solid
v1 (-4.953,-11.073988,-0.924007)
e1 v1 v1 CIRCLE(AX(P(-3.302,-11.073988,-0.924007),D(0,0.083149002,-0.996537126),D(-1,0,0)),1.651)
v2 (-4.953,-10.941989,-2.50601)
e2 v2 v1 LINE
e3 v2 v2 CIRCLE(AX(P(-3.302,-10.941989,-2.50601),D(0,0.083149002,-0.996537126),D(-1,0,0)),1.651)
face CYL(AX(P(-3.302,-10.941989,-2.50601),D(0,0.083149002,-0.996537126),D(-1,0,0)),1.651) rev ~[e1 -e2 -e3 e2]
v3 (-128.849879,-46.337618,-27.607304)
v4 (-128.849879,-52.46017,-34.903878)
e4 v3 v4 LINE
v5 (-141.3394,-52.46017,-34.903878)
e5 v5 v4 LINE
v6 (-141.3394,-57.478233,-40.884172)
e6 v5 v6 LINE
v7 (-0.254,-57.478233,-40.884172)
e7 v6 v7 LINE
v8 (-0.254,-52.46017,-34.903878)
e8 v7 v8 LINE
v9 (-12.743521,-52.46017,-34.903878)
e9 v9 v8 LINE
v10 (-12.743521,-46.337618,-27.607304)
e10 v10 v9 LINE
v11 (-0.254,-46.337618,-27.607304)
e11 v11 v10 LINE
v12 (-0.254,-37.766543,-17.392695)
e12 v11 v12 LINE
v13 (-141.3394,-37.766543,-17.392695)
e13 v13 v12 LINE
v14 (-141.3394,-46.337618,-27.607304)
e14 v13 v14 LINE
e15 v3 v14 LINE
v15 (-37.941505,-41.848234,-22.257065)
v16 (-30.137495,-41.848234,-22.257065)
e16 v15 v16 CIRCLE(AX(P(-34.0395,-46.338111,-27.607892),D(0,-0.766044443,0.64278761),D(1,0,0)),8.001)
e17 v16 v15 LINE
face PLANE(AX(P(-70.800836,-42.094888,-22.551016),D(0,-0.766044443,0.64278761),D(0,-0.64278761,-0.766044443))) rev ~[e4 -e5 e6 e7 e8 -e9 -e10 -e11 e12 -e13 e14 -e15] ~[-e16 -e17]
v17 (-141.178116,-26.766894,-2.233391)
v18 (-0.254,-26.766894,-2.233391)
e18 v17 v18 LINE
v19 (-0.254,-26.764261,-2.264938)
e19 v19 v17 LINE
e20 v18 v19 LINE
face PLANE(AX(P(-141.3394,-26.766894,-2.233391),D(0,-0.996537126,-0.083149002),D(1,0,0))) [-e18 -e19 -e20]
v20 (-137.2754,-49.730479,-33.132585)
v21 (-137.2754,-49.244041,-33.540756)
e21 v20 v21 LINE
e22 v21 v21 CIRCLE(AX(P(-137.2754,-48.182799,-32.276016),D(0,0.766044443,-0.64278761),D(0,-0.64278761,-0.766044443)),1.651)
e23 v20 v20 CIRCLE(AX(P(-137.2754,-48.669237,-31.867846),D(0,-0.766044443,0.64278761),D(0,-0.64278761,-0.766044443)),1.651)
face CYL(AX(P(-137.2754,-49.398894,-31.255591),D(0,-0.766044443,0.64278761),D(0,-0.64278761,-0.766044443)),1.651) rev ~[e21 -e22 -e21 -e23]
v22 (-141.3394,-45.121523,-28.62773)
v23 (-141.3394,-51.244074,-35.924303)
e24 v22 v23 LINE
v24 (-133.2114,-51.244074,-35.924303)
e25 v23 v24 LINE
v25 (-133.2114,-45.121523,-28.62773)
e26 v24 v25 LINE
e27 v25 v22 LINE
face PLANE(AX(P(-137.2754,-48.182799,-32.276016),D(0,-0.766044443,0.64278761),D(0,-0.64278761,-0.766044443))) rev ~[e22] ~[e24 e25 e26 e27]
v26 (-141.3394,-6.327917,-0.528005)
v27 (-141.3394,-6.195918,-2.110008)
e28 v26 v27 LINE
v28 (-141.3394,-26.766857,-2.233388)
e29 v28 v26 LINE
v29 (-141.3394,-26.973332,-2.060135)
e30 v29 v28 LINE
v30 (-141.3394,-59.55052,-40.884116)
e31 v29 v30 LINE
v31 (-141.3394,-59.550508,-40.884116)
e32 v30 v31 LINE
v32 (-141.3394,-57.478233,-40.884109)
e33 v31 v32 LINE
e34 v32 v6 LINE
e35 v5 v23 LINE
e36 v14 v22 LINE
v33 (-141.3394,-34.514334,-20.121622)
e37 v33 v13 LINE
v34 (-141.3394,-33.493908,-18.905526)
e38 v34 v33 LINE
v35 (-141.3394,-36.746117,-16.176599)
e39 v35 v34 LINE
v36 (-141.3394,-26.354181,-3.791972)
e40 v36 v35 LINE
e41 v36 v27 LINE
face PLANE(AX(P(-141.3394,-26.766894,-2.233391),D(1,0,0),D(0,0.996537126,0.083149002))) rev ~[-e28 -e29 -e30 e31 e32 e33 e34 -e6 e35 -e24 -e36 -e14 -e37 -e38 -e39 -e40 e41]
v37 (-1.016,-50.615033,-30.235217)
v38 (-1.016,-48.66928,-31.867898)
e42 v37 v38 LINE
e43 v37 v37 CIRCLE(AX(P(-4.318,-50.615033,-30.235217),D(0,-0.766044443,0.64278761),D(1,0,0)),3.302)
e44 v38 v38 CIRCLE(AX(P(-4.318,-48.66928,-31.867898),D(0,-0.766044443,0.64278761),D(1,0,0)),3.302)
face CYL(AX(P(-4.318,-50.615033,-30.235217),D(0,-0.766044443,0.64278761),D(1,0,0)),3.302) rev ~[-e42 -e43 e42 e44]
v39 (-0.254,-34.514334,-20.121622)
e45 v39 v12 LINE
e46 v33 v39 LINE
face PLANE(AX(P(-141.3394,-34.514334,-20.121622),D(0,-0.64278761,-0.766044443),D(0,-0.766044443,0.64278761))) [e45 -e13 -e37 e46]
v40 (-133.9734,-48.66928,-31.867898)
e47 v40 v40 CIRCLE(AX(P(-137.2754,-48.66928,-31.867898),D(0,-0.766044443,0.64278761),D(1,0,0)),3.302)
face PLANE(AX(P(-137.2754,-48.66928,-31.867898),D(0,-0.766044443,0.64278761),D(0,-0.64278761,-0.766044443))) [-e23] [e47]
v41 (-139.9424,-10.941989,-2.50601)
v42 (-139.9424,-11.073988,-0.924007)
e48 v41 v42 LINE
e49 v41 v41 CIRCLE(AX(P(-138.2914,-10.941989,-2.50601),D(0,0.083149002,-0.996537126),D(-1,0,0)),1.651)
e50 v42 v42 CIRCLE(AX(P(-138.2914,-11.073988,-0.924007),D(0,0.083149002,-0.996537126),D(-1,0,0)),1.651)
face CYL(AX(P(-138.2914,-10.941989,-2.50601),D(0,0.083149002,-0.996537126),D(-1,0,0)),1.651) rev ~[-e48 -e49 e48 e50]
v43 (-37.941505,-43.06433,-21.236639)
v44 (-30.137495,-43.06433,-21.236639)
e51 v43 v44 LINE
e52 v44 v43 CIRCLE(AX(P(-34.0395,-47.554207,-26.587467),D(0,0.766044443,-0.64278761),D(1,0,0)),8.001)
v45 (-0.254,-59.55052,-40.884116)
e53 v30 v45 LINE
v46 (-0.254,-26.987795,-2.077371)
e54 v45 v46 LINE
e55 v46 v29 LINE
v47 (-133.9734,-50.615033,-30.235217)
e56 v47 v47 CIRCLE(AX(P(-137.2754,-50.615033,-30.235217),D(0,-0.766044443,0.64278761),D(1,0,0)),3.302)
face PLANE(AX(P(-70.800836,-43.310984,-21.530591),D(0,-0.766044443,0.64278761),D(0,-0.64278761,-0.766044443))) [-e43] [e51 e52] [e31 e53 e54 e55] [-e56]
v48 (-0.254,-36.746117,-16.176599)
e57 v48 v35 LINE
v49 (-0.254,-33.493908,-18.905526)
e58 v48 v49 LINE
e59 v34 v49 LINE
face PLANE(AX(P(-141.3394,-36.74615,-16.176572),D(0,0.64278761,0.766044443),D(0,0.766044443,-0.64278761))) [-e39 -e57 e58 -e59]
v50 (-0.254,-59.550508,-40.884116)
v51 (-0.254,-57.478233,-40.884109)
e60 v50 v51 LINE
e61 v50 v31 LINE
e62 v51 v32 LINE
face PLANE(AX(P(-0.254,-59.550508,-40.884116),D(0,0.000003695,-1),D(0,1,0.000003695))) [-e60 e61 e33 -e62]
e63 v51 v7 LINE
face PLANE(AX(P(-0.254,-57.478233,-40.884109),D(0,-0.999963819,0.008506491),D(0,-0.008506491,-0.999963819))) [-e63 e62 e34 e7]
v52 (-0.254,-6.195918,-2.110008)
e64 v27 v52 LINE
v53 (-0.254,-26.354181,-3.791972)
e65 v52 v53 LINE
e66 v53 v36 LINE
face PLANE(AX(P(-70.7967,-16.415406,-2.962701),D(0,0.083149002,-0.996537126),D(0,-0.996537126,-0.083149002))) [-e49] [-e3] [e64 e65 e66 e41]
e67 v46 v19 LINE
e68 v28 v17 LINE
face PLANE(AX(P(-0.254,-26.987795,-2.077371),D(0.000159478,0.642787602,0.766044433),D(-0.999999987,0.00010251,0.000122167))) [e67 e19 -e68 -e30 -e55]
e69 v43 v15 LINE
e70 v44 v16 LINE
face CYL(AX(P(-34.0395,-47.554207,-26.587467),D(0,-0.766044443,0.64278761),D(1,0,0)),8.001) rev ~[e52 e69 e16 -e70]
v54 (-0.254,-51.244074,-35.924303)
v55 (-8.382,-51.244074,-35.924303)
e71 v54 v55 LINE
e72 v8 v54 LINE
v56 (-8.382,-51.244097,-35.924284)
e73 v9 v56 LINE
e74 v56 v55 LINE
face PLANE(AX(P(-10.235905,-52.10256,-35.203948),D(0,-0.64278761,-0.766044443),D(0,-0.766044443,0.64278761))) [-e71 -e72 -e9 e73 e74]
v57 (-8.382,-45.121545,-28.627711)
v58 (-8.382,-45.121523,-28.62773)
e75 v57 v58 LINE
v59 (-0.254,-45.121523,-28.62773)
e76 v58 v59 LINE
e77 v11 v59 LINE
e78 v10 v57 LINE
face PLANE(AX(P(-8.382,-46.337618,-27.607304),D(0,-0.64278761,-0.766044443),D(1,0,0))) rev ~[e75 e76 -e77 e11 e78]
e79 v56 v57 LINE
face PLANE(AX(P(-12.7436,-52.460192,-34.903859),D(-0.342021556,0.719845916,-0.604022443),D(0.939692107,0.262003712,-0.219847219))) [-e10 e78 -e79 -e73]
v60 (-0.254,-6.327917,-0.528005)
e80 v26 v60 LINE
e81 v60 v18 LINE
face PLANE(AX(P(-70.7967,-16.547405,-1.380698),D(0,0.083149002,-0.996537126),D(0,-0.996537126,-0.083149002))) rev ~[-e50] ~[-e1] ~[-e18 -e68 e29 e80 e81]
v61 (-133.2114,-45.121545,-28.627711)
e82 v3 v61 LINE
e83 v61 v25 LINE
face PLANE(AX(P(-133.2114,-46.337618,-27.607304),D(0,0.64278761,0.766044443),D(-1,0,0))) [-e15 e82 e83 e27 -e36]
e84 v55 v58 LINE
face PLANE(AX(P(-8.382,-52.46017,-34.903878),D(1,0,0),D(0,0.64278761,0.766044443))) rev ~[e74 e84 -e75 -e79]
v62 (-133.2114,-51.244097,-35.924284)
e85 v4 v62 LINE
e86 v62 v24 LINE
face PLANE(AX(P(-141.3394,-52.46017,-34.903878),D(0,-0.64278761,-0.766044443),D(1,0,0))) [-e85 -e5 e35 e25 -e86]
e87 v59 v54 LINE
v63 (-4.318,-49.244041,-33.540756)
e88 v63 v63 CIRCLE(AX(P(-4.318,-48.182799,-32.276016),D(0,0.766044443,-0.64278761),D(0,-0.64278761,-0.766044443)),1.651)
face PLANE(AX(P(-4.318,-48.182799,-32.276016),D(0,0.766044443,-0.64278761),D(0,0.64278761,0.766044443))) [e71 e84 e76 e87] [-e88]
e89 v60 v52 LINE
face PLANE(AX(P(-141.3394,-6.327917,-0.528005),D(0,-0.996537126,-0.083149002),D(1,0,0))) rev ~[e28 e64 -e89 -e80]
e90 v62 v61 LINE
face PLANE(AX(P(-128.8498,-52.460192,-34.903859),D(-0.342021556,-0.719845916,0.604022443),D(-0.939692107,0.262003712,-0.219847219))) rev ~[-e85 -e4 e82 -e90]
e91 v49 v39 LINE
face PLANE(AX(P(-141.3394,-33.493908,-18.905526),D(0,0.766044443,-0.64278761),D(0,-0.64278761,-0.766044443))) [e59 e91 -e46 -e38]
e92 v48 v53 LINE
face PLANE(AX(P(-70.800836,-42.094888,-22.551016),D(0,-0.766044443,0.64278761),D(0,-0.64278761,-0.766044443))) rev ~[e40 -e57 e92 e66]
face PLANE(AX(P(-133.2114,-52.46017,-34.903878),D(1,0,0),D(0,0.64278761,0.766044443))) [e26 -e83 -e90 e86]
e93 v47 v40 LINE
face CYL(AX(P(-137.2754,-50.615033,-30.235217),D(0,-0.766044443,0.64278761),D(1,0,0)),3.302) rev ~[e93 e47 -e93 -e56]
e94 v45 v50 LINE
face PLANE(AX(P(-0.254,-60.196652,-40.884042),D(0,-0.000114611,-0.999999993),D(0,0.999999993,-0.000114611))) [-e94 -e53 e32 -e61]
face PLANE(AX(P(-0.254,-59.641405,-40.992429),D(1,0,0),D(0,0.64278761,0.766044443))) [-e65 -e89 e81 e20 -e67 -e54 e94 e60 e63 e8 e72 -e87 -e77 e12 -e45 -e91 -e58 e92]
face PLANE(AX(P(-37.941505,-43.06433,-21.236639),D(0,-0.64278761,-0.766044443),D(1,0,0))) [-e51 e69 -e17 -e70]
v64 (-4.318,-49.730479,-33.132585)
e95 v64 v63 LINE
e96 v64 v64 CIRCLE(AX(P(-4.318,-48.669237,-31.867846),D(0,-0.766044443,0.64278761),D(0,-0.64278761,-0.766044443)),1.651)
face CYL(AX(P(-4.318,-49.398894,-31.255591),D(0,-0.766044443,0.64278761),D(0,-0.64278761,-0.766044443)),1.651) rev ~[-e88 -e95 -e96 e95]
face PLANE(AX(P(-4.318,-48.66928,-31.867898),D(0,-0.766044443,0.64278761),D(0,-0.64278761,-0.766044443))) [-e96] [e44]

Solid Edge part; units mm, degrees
sketch "Sketch1" plane through (0.7938, -13.3834, -1.1167) normal (0, -0.083149, 0.9965371) x (0, 0.9965371, 0.083149)
  line L0 (-13.43, 142.1332) -> (7.08, 142.1332)
  line L1 (7.08, 142.1332) -> (7.08, 1.0478)
  line L2 (7.08, 1.0478) -> (-13.43, 1.0478)
  line L3 (-13.43, 142.1332) -> (-13.43, 1.0478)
extrude "Protrusion1" add sketch "Sketch1" against normal blind 1.5875
sketch "Sketch2" plane through (-136.8309, -10.9401, -2.5058) normal (0, 0.083149, -0.9965371) x (-1, 0, 0)
  circle A0 centre (-133.5289, -0.0019) radius 1.651
  circle A1 centre (1.4605, -0.0019) radius 1.651
extrude "Cutout1" cut sketch "Sketch2" against normal through all
sketch "Sketch3" plane through (-142.3872, -43.3146, -21.5349) normal (0, -0.7660444, 0.6427876) x (0, 0.6427876, 0.7660444)
  line L0 (-25.4, -142.1332) -> (25.4, -142.1332)
  line L1 (25.4, -142.1332) -> (25.4225, -1.0478)
  line L2 (25.4225, -1.0478) -> (-25.4, -1.0478)
  line L3 (-25.4, -1.0478) -> (-25.4, -142.1332)
extrude "ExtrudedProtrusion_5" add sketch "Sketch3" against normal blind 1.5875
sketch "Sketch4" plane through (-0.254, -29.7685, -21.1109) normal (1, 0, 0) x (0, 0.9965371, 0.083149)
  line L0 (-33.0506, -58.6212) -> (-31.9669, -17.1746)
  line L1 (-31.9669, -17.1746) -> (-31.323, -17.2284)
  line L2 (-31.323, -17.2284) -> (-29.2579, -17.4007)
  line L3 (-29.2579, -17.4007) -> (-33.0506, -58.6212)
extrude "Cutout2" cut sketch "Sketch4" against normal through all
sketch "Sketch5" plane through (-70.7967, -41.8719, -22.2853) normal (0, 0.7660444, -0.6427876) x (0, -0.6427876, -0.7660444)
  line L0 (16.4724, 70.5427) -> (16.4724, 62.4147)
  line L1 (16.4724, 62.4147) -> (6.9474, 62.4147)
  line L2 (6.9474, 62.4147) -> (6.9474, 70.5427)
  line L3 (6.9474, 70.5427) -> (16.4724, 70.5427)
  circle A0 centre (11.7099, 66.4787) radius 1.651
  line L4 (16.4724, -70.5427) -> (16.4724, -62.4147)
  line L5 (16.4724, -62.4147) -> (6.9474, -62.4147)
  line L6 (6.9474, -62.4147) -> (6.9474, -70.5427)
  line L7 (6.9474, -70.5427) -> (16.4724, -70.5427)
  circle A1 centre (11.7099, -66.4787) radius 1.651
extrude "Protrusion2" add sketch "Sketch5" along normal up to vertex (1.5875 mm away)
sketch "Sketch6" plane through (-70.7967, -43.304, -21.5222) normal (0, -0.7660444, 0.6427876) x (1, 0, 0)
  circle A0 centre (66.4787, -11.374) radius 3.302
  circle A1 centre (-66.4787, -11.374) radius 3.302
  dimension "D1" = 6.604
extrude "countersink_lower" cut sketch "Sketch6" against normal blind 2.54
sketch "Sketch7" plane through (-4.318, -51.6286, -35.6017) normal (0, -0.6427876, -0.7660444) x (-1, 0, 0)
  line L0 (8.4256, -1.0856) -> (4.064, 0.5019)
  line L1 (4.064, 0.5019) -> (4.064, -1.0856)
  line L2 (4.064, -1.0856) -> (8.4256, -1.0856)
  line L3 (124.5318, -1.0856) -> (128.8934, 0.5019)
  line L4 (128.8934, 0.5019) -> (128.8934, -1.0856)
  line L5 (128.8934, -1.0856) -> (124.5318, -1.0856)
extrude "Protrusion3" add sketch "Sketch7" against normal up to vertex (9.525 mm away)
sketch "Sketch8" plane through (-70.7967, -43.304, -21.5222) normal (0, -0.7660444, 0.6427876) x (1, 0, 0)
  arc A0 (40.6592, 0.3728) -> (32.8552, 0.3728) centre (36.7572, -6.6122) cw
  line L0 (32.8552, 0.3728) -> (40.6592, 0.3728)
extrude "Cutout3" cut sketch "Sketch8" against normal up to next
sketch "Sketch9" plane through (-141.3394, -32.8733, -20.7061) normal (-1, 0, 0) x (0, -0.6427876, -0.7660444)
  line L0 (-0.9804, 5.8783) -> (-0.9804, 1.6328)
  line L1 (-0.9804, 1.6328) -> (0.6071, 1.6328)
  line L2 (0.6071, 1.6328) -> (0.6071, 5.8783)
  line L3 (0.6071, 5.8783) -> (-0.9804, 5.8783)
extrude "Protrusion4" add sketch "Sketch9" against normal up to vertex (141.0854 mm away)
